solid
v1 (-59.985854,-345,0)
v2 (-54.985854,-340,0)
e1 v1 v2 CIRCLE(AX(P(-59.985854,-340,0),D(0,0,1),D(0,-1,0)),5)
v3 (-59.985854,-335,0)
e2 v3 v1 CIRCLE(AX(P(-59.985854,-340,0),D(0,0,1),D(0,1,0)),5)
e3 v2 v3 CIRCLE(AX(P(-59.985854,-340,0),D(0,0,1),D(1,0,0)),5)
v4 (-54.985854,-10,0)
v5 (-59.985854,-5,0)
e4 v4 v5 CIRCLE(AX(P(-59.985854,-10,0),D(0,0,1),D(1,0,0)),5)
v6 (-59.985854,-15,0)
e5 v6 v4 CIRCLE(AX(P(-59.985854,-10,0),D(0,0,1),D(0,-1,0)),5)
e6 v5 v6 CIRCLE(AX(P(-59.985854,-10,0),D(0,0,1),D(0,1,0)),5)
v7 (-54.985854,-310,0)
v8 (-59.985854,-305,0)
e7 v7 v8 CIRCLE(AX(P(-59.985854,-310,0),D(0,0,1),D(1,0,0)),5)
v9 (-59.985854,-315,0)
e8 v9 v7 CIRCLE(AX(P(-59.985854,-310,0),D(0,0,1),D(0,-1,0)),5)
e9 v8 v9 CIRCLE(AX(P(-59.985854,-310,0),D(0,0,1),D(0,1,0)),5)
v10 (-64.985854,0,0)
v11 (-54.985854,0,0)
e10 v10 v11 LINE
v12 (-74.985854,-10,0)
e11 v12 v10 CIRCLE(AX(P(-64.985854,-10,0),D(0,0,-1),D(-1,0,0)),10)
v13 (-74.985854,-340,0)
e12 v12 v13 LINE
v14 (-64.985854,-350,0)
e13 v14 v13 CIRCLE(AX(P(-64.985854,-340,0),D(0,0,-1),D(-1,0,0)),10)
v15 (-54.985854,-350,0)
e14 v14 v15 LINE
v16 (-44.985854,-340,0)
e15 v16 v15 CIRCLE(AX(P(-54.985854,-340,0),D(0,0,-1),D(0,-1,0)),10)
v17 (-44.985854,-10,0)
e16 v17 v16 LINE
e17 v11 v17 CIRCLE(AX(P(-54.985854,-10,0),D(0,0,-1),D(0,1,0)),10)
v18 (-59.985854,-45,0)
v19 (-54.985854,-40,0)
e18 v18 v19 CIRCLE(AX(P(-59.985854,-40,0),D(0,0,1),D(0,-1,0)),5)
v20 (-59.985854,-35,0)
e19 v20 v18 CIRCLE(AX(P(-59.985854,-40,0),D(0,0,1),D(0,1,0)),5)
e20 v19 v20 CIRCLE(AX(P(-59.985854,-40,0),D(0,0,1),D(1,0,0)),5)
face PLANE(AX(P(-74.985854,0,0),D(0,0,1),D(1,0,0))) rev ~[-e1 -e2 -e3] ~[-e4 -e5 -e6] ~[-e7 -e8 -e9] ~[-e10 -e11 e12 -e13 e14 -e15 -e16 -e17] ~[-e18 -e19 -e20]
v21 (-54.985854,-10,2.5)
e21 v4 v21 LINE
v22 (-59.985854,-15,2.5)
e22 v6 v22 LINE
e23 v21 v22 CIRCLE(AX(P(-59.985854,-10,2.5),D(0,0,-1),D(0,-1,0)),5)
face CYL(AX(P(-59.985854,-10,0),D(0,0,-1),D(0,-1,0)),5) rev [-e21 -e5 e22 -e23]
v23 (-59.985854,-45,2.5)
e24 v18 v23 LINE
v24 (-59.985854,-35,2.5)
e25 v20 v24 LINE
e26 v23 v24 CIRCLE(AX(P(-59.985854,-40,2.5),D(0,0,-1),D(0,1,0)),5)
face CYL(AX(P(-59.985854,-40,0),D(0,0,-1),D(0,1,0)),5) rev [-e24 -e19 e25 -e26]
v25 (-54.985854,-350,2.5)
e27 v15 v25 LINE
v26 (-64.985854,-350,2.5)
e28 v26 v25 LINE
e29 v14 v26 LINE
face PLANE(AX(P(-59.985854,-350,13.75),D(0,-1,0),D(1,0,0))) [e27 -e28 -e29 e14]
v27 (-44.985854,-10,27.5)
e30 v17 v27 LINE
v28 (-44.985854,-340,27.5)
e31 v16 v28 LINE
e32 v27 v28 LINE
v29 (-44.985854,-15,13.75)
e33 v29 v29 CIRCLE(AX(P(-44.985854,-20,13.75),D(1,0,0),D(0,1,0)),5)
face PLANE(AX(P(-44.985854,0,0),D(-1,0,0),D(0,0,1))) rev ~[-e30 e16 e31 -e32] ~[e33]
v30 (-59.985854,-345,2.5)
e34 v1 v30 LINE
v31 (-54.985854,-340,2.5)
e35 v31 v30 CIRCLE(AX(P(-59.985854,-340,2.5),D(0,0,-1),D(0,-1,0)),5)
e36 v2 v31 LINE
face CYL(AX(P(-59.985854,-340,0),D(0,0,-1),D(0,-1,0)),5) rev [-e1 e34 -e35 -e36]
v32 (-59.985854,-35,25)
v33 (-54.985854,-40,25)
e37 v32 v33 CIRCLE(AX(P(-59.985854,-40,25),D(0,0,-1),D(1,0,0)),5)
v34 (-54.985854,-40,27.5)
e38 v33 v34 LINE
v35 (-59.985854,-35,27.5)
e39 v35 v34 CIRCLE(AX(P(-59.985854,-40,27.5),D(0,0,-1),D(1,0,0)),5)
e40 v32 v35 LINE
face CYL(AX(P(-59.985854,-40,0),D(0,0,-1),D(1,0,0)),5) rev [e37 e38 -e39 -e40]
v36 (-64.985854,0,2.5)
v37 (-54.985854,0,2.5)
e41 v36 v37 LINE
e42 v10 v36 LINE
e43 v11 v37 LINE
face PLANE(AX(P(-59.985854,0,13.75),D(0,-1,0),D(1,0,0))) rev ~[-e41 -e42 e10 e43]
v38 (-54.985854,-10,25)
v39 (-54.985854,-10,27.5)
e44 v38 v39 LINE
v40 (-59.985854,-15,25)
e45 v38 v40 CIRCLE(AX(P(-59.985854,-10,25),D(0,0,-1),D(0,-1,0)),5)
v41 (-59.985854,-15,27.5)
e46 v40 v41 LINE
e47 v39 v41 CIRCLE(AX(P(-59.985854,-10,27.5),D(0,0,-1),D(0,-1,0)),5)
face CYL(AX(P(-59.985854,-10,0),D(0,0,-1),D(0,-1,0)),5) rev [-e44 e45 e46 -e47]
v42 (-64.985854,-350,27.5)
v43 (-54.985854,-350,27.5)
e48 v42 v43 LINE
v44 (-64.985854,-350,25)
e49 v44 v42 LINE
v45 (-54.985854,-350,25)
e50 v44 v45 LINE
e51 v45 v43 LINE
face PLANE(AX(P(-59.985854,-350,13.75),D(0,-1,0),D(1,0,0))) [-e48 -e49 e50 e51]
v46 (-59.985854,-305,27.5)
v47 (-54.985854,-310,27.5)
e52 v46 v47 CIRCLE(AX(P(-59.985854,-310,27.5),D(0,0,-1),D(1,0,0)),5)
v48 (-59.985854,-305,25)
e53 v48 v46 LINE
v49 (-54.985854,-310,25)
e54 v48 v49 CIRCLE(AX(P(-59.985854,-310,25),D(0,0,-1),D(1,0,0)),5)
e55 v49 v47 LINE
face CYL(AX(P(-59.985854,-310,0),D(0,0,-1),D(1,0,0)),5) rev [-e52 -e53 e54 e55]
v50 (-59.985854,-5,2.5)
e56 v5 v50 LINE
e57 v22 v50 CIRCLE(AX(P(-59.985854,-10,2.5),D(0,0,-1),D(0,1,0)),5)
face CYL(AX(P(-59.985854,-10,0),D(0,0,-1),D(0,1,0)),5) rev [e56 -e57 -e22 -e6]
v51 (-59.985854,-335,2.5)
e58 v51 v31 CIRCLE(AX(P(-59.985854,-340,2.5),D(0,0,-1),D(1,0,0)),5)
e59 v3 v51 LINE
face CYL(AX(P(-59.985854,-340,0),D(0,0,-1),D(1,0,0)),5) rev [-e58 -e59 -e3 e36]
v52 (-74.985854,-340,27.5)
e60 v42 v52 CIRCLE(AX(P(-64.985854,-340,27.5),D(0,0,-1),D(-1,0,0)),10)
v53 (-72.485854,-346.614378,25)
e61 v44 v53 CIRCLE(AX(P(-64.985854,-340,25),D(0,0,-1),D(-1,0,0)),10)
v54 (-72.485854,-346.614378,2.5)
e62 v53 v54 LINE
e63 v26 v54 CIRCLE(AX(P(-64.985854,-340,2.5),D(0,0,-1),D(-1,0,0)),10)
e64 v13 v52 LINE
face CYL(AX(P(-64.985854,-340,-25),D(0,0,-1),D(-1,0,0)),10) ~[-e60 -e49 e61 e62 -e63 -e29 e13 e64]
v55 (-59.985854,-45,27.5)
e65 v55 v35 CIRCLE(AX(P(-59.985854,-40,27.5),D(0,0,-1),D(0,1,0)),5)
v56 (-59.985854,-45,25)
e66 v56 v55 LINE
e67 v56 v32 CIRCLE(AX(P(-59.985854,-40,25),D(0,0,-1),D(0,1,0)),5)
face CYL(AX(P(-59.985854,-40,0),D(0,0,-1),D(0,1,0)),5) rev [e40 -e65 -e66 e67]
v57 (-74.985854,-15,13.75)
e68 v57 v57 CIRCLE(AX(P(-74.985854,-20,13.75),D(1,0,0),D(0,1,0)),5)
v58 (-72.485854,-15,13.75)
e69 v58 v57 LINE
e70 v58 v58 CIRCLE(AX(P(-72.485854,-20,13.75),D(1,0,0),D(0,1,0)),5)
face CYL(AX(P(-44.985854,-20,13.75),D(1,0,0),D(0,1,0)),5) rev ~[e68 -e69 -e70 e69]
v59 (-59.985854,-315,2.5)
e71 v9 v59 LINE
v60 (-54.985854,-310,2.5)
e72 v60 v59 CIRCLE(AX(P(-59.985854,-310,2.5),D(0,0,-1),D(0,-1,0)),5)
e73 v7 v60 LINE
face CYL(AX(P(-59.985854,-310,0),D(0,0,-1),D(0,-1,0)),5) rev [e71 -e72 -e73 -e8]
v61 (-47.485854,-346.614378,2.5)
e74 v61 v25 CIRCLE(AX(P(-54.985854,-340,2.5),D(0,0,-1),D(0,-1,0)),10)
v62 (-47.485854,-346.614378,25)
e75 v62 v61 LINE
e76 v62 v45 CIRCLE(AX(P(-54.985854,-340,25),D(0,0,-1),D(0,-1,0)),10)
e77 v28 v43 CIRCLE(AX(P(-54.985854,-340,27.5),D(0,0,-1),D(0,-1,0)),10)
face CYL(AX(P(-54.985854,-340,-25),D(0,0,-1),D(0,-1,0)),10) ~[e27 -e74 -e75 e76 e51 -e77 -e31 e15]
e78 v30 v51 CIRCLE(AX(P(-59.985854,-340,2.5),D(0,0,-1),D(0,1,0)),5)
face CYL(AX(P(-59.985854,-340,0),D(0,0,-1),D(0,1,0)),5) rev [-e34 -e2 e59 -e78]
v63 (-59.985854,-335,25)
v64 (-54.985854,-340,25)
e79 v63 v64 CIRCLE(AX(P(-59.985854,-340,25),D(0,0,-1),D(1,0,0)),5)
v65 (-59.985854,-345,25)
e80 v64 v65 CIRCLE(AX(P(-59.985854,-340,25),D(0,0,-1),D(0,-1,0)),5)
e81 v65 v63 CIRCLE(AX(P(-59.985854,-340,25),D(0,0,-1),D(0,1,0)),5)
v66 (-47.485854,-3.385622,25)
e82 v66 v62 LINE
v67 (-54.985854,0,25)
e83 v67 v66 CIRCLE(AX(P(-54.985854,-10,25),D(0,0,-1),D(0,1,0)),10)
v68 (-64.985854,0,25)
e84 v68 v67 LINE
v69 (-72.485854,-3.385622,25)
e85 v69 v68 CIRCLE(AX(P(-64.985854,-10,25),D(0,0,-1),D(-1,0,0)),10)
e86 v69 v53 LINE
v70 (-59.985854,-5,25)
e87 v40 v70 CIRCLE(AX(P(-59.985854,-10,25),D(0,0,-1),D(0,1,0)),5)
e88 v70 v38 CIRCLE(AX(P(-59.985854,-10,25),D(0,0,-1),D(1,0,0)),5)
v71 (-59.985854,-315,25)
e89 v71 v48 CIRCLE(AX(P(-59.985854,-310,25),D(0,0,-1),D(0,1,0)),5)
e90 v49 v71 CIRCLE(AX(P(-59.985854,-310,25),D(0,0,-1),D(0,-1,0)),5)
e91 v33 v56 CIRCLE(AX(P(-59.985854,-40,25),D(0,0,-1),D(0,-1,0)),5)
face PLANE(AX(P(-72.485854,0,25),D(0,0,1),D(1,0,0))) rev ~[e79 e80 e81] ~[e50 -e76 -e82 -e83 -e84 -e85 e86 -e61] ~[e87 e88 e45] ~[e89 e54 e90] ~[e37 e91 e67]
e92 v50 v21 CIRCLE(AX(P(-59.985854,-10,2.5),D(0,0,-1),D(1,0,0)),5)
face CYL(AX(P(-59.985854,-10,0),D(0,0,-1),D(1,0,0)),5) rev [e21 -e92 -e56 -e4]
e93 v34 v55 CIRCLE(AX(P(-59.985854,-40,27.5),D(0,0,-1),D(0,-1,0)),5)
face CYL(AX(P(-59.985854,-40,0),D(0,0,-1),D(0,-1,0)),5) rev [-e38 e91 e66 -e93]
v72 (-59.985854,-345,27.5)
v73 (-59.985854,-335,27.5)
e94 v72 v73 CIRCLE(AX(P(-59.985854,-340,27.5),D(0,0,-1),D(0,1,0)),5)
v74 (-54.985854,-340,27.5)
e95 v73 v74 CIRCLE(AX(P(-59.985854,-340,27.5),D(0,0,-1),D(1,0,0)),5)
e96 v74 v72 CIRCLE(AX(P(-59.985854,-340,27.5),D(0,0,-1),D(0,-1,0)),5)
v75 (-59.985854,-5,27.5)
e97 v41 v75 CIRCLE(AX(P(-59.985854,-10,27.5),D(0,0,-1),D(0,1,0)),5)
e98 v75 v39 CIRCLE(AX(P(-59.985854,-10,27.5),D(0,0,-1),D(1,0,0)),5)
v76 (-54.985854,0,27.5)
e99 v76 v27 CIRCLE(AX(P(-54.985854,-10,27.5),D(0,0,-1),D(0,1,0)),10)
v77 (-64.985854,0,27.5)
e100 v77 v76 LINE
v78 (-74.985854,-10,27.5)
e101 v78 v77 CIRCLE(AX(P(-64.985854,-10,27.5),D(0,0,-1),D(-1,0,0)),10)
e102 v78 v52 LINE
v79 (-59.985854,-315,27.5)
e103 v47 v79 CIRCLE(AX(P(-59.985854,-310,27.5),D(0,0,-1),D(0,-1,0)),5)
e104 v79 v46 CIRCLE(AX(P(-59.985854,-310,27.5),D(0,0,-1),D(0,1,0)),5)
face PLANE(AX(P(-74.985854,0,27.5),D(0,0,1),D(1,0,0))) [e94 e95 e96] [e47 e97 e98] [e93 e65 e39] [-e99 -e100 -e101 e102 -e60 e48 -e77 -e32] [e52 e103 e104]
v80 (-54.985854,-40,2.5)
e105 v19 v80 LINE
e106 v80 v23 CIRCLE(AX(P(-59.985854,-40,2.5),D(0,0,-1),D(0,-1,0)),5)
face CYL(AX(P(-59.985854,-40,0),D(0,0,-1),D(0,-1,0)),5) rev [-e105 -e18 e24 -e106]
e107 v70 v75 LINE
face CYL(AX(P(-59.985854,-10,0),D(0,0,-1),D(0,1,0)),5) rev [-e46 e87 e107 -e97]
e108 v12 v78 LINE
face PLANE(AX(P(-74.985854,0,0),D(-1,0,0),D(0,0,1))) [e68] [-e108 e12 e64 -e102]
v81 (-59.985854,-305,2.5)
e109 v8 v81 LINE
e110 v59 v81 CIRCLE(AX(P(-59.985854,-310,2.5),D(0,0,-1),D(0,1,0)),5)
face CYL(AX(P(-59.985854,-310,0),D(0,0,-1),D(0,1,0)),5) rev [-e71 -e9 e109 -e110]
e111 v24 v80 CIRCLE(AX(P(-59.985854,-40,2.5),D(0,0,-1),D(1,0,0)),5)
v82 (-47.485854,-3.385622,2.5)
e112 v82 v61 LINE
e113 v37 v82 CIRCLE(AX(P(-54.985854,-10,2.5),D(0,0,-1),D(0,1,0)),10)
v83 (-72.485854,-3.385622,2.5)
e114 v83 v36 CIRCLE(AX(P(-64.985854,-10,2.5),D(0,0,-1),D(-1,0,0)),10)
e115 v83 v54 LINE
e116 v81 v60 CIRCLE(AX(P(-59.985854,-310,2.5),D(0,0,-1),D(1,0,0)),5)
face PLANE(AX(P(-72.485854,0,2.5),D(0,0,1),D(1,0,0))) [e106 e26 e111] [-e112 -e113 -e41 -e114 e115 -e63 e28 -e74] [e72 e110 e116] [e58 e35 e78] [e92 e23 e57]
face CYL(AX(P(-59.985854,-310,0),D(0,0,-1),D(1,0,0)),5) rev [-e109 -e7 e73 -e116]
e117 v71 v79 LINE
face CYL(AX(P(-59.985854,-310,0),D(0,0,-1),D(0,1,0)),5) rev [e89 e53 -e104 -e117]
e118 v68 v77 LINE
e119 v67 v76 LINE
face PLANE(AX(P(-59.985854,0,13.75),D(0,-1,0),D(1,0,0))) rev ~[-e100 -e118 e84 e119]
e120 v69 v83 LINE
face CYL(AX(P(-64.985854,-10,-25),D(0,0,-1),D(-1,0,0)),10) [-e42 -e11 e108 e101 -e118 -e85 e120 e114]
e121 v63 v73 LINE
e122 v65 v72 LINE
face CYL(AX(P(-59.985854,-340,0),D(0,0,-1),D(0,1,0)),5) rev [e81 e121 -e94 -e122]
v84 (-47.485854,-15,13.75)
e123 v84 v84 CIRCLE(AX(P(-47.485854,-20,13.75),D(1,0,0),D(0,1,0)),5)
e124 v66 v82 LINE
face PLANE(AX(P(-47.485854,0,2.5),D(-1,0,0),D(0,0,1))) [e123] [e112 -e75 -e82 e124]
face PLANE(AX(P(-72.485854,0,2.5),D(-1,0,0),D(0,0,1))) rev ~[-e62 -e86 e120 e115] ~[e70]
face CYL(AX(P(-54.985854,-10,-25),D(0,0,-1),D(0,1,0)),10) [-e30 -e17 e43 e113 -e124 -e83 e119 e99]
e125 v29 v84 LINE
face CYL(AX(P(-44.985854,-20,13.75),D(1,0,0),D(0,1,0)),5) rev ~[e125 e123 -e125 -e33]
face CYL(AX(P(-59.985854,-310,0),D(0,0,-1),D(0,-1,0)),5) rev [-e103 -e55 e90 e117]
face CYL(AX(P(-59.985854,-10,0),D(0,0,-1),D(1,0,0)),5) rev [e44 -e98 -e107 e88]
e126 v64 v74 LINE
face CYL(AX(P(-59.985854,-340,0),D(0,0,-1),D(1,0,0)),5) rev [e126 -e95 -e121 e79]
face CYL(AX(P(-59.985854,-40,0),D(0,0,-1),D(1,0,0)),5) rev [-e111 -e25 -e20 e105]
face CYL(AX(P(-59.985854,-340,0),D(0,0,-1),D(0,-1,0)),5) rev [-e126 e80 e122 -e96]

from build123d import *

# Parameters (mm, degrees)
F0_W        = 30
F0_H        = 27.5
F0_W_2      = 25
F0_H_2      = 22.5
F1_DEPTH    = 350
F3_DEPTH    = 53
F4_T1_DEPTH = 77.5
F5_R        = 5
F6_DEPTH    = 37.8


# Not quite as in the source:
# - a fillet or chamfer that OpenCascade refuses, or shapes differently, is made with other operations: its cross-section is extruded or revolved along the edge and cut away or added
# - a feature names something its author has since deleted; it is built from what else it names


with BuildPart() as f1:
    # F0 (on Front) → F1 (new body)
    with BuildSketch(Plane.XZ):
        with Locations((-59.9858543277, 13.75)):
            Rectangle(F0_W, F0_H)
        with Locations((-59.9858543277, 13.75)):
            Rectangle(F0_W_2, F0_H_2, mode=Mode.SUBTRACT)
    extrude(amount=F1_DEPTH)

    # F2 (on Top) → F3 (cut)
    with BuildSketch(Plane.XY):
        with BuildLine():
            Line((-59.9858543277, -340), (-59.9858543277, -335))
            ThreePointArc((-59.9858543277, -335), (-64.9858543277, -340), (-59.9858543277, -345))
            Line((-59.9858543277, -345), (-59.9858543277, -340))
        make_face()
        with BuildLine():
            ThreePointArc((-54.9858543277, -340), (-56.4503204217, -336.4644660941), (-59.9858543277, -335))
            Line((-59.9858543277, -335), (-59.9858543277, -340))
            Line((-59.9858543277, -340), (-59.9858543277, -345))
            ThreePointArc((-59.9858543277, -345), (-56.4503204217, -343.5355339059), (-54.9858543277, -340))
        make_face()
        with BuildLine():
            Line((-59.9858543277, -45), (-59.9858543277, -35))
            ThreePointArc((-59.9858543277, -35), (-64.9858543277, -40), (-59.9858543277, -45))
        make_face()
        with BuildLine():
            ThreePointArc((-54.9858543277, -40), (-56.4503204217, -36.4644660941), (-59.9858543277, -35))
            Line((-59.9858543277, -35), (-59.9858543277, -45))
            ThreePointArc((-59.9858543277, -45), (-56.4503204217, -43.5355339059), (-54.9858543277, -40))
        make_face()
        with BuildLine():
            Line((-59.9858543277, -15), (-59.9858543277, -5))
            ThreePointArc((-59.9858543277, -5), (-64.9858543277, -10), (-59.9858543277, -15))
        make_face()
        with BuildLine():
            ThreePointArc((-59.9858543277, -15), (-56.4503204217, -13.5355339059), (-54.9858543277, -10))
            ThreePointArc((-54.9858543277, -10), (-56.4503204217, -6.4644660941), (-59.9858543277, -5))
            Line((-59.9858543277, -5), (-59.9858543277, -15))
        make_face()
        with BuildLine():
            Line((-59.9858543277, -315), (-59.9858543277, -305))
            ThreePointArc((-59.9858543277, -305), (-64.9858543277, -310), (-59.9858543277, -315))
        make_face()
        with BuildLine():
            ThreePointArc((-54.9858543277, -310), (-56.4503204217, -306.4644660941), (-59.9858543277, -305))
            Line((-59.9858543277, -305), (-59.9858543277, -315))
            ThreePointArc((-59.9858543277, -315), (-56.4503204217, -313.5355339059), (-54.9858543277, -310))
        make_face()
    extrude(amount=F3_DEPTH, mode=Mode.SUBTRACT)

    # F4: fillet of radius 10 on 4 edges, made by hand

    # F4_s2 → F4_t1 (cut)
    with BuildSketch(Plane.XY.offset(-25)):
        with BuildLine():
            ThreePointArc((-74.9858543277, -10), (-72.0569221395, -2.9289321881), (-64.9858543277, 0))
            Line((-64.9858543277, 0), (-74.9858543277, 0))
            Line((-74.9858543277, 0), (-74.9858543277, -10))
        make_face()
        with BuildLine():
            ThreePointArc((-74.9858543277, -340), (-72.0569221395, -347.0710678119), (-64.9858543277, -350))
            Line((-64.9858543277, -350), (-74.9858543277, -350))
            Line((-74.9858543277, -350), (-74.9858543277, -340))
        make_face()
        with BuildLine():
            ThreePointArc((-54.9858543277, 0), (-47.9147865158, -2.9289321881), (-44.9858543277, -10))
            Line((-44.9858543277, -10), (-44.9858543277, 0))
            Line((-44.9858543277, 0), (-54.9858543277, 0))
        make_face()
        with BuildLine():
            ThreePointArc((-54.9858543277, -350), (-47.9147865158, -347.0710678119), (-44.9858543277, -340))
            Line((-44.9858543277, -340), (-44.9858543277, -350))
            Line((-44.9858543277, -350), (-54.9858543277, -350))
        make_face()
    extrude(amount=F4_T1_DEPTH, mode=Mode.SUBTRACT)

    # F5 (on face) → F6 (cut)
    with BuildSketch(Plane.YZ.offset(-44.9858543277)):
        with Locations((-20, 13.75)):
            Circle(F5_R)
    extrude(amount=-F6_DEPTH, mode=Mode.SUBTRACT)


solid = f1.part
